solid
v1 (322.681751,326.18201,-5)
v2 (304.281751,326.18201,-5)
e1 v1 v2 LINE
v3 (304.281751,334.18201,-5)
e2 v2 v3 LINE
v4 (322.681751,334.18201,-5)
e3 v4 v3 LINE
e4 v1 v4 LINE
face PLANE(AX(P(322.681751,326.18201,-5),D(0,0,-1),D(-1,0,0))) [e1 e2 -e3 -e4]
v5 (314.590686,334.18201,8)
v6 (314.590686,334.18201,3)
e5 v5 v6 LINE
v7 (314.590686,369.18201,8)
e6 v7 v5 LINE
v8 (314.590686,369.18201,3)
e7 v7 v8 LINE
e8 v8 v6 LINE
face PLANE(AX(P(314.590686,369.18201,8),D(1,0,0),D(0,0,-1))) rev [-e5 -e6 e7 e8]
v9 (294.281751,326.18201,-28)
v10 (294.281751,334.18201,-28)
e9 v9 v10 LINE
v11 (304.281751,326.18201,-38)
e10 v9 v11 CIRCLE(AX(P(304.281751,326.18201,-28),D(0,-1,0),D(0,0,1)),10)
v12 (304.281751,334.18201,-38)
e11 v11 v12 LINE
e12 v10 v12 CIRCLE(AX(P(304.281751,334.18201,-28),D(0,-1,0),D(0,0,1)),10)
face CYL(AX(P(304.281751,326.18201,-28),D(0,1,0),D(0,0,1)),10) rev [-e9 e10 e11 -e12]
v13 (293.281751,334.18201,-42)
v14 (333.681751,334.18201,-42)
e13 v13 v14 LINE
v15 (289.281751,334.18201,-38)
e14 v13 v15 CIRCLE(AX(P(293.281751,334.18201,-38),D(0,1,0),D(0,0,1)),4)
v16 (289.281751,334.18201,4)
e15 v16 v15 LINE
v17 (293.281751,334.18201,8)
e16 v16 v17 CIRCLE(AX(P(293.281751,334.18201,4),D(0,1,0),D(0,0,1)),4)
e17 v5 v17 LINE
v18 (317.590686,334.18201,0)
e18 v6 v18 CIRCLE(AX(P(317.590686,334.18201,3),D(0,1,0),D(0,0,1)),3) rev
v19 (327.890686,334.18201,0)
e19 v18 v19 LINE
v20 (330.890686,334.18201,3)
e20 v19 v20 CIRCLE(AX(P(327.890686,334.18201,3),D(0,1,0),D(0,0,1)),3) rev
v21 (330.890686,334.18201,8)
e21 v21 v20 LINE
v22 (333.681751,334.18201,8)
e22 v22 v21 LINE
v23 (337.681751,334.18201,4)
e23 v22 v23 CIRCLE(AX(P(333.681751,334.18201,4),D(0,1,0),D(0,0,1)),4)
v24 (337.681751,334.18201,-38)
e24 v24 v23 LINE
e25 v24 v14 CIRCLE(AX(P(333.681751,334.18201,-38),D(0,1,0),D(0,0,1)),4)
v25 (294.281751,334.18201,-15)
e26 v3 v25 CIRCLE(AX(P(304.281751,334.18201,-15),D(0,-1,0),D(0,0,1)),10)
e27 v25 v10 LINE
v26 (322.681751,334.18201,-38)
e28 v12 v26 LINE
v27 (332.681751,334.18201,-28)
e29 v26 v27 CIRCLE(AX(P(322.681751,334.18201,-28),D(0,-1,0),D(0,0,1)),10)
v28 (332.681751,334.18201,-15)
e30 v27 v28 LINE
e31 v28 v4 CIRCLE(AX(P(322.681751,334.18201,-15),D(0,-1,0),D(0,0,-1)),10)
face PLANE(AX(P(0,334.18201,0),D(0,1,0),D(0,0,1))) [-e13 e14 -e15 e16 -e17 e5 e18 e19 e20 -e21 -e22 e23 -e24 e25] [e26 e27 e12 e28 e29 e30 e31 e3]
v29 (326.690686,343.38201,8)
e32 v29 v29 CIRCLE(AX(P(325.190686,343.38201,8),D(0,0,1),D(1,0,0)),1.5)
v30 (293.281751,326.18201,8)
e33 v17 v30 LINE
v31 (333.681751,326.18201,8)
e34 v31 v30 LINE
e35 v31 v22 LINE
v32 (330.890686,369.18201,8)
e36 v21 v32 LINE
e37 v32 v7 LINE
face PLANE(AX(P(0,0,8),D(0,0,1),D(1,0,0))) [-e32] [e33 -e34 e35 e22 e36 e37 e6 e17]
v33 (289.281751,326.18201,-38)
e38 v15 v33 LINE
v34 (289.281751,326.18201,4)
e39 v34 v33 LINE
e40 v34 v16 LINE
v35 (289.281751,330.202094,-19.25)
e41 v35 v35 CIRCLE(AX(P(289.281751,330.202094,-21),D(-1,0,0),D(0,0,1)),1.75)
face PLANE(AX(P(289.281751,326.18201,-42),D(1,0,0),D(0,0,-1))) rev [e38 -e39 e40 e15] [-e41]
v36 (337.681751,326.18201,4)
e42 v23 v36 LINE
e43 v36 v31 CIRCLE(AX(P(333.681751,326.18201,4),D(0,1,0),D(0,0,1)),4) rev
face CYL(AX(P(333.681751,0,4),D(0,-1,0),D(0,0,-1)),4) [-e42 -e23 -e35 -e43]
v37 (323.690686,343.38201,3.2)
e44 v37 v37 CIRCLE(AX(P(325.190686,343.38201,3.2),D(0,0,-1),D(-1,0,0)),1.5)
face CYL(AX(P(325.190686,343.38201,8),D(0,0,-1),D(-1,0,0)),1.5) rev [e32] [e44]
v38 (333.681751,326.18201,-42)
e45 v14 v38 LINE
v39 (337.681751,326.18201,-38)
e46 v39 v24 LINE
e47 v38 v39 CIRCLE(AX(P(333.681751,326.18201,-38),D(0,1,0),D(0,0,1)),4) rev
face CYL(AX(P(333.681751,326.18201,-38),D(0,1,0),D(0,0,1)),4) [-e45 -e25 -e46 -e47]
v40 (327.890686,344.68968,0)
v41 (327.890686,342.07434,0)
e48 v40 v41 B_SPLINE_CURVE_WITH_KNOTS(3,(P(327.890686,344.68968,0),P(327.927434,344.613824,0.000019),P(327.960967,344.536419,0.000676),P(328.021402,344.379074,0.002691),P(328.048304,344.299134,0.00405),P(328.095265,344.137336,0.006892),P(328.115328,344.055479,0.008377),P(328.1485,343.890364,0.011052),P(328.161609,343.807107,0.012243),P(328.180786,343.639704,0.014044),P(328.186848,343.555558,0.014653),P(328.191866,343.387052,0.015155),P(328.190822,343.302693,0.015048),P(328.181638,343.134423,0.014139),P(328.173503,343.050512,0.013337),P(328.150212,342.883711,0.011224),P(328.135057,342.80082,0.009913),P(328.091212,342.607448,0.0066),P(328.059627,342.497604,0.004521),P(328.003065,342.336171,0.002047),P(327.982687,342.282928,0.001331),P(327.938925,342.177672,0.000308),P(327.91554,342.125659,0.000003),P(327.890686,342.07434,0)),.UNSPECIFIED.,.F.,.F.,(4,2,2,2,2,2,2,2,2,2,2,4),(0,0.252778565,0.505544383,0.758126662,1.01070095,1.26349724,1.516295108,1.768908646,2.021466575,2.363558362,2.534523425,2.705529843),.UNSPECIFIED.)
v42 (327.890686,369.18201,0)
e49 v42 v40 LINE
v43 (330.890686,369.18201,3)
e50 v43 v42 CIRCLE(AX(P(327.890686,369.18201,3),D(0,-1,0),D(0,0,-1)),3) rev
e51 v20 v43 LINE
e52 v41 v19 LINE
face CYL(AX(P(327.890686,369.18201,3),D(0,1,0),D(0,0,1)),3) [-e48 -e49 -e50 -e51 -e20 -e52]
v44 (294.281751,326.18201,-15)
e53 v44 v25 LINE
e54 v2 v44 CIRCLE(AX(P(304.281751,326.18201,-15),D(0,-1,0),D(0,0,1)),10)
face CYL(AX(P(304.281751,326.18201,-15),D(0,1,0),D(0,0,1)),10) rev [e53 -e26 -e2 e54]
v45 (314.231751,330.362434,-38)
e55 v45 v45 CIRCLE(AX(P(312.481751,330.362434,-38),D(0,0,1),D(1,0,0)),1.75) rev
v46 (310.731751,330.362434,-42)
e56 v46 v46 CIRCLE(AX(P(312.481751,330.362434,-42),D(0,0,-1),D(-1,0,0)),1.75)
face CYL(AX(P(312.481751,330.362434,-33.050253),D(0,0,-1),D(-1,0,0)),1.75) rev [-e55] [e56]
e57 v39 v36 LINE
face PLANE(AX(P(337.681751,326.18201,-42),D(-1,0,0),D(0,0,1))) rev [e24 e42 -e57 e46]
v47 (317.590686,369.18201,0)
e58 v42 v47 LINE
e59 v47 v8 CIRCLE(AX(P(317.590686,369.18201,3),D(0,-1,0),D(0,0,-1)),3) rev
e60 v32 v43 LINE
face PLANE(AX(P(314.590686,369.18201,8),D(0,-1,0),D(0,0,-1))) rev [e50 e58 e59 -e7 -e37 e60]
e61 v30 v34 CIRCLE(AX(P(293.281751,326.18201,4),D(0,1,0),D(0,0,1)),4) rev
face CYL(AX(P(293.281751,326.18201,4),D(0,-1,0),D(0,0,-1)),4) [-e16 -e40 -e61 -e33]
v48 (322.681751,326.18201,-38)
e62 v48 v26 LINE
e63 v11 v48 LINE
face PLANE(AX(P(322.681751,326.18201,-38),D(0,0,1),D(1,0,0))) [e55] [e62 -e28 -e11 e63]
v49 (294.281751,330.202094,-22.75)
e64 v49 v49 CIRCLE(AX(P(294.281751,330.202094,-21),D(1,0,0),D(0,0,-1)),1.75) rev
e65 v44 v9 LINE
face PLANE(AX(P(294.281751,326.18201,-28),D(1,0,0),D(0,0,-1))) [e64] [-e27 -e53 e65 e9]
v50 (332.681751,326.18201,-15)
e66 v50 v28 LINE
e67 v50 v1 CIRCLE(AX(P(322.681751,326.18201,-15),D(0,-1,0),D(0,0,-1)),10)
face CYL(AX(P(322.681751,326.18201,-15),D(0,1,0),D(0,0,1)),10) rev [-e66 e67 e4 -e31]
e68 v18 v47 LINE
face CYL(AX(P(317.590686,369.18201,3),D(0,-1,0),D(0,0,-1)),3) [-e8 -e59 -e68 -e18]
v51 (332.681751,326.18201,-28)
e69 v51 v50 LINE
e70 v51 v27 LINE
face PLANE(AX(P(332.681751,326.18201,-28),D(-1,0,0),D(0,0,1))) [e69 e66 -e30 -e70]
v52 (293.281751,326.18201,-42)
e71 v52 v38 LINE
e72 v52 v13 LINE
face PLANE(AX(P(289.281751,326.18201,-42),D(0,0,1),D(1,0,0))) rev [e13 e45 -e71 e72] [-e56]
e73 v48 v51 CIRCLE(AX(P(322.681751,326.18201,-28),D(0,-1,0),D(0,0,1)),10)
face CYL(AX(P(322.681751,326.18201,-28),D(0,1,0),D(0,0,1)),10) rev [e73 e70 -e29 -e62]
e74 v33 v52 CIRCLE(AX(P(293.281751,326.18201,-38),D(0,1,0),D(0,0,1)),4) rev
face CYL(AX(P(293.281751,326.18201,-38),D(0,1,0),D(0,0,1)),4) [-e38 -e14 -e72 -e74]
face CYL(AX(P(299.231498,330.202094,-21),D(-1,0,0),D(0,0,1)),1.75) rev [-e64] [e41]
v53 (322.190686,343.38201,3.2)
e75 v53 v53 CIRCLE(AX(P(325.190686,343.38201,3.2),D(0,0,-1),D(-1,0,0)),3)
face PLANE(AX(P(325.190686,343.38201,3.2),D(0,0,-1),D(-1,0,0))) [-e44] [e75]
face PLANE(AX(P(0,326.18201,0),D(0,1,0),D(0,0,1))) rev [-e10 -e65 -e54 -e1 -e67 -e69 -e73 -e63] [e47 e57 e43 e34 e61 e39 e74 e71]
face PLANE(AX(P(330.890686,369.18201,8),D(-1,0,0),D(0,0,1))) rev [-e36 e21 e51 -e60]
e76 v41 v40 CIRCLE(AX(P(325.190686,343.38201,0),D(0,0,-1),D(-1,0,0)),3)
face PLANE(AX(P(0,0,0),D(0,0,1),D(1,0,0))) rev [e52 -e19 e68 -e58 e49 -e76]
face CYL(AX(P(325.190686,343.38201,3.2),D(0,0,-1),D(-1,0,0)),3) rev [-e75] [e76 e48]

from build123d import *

# Parameters (mm, degrees)
SKETCH1_W           = 16.3
SKETCH1_H           = 35
SKETCH1_R           = 1.5
BOSS_EXTRUDE1_DEPTH = 8
SKETCH2_W           = 48.4
SKETCH2_H           = 50
BOSS_EXTRUDE2_DEPTH = 8
SKETCH3_R           = 1.75
CUT_EXTRUDE1_DEPTH  = 4
SKETCH4_R           = 1.75
CUT_EXTRUDE2_DEPTH  = 5
SKETCH5_R           = 3
CUT_EXTRUDE3_DEPTH  = 3.2
FILLET1_R           = 4
FILLET2_R           = 3


with BuildPart() as part:
    # Sketch1 → Boss-Extrude1 (new body)
    with BuildSketch(Plane.XY):
        with Locations((322.740686013, 351.682010011)):
            Rectangle(SKETCH1_W, SKETCH1_H)
        with Locations((325.190686013, 343.382010011)):
            Circle(SKETCH1_R, mode=Mode.SUBTRACT)
    extrude(amount=BOSS_EXTRUDE1_DEPTH)

    # Sketch2 → Boss-Extrude2 (add)
    with BuildSketch(Plane(origin=(0, 334.182010011, 0), x_dir=(-1, 0, 0), z_dir=(0, -1, 0))):
        with Locations((-313.481750966, 17)):
            Rectangle(SKETCH2_W, SKETCH2_H)
        with BuildLine():
            Line((-322.681750966, 38), (-304.281750966, 38))
            ThreePointArc((-304.281750966, 38), (-297.210683154, 35.071067812), (-294.281750966, 28))
            Line((-294.281750966, 28), (-294.281750966, 15))
            ThreePointArc((-294.281750966, 15), (-297.210683154, 7.928932188), (-304.281750966, 5))
            Line((-304.281750966, 5), (-322.681750966, 5))
            ThreePointArc((-322.681750966, 5), (-329.752818778, 7.928932188), (-332.681750966, 15))
            Line((-332.681750966, 15), (-332.681750966, 28))
            ThreePointArc((-332.681750966, 28), (-329.752818778, 35.071067812), (-322.681750966, 38))
        make_face(mode=Mode.SUBTRACT)
    extrude(amount=BOSS_EXTRUDE2_DEPTH)

    # Sketch3 → Cut-Extrude1 (cut)
    with BuildSketch(Plane(origin=(0, 0, -42), x_dir=(-1, 0, 0), z_dir=(0, 0, -1))):
        with Locations((-312.481750966, 330.362434358)):
            Circle(SKETCH3_R)
    extrude(amount=-CUT_EXTRUDE1_DEPTH, mode=Mode.SUBTRACT)

    # Sketch4 → Cut-Extrude2 (cut)
    with BuildSketch(Plane.ZY.offset(-289.281750966)):
        with Locations((-21, 330.202094394)):
            Circle(SKETCH4_R)
    extrude(amount=-CUT_EXTRUDE2_DEPTH, mode=Mode.SUBTRACT)

    # Sketch5 → Cut-Extrude3 (cut)
    with BuildSketch(Plane(origin=(0, 0, 0), x_dir=(-1, 0, 0), z_dir=(0, 0, -1))):
        with Locations((-325.190686013, 343.382010011)):
            Circle(SKETCH5_R)
    extrude(amount=-CUT_EXTRUDE3_DEPTH, mode=Mode.SUBTRACT)

    # Fillet1
    fillet1_edges = [part.edges().sort_by_distance(p)[0] for p in [
        (337.681750966, 330.182010011, -42),
        (337.681750966, 330.182010011, 8),
        (289.281750966, 330.182010011, 8),
        (289.281750966, 330.182010011, -42),
    ]]
    fillet(fillet1_edges, radius=FILLET1_R)

    # Fillet2
    # the kernel refuses this fillet: 3 mm, written as the material it takes off along each edge
    with BuildSketch(Plane(origin=(330.890686013, 376.682010011, 0), x_dir=(-1, 0, 0), z_dir=(0, -1, 0))) as fillet2_piece_1:
        with BuildLine():
            CenterArc((FILLET2_R, -FILLET2_R), FILLET2_R, 90, 90)
            Line((0, -FILLET2_R), (0, 0))
            Line((0, 0), (FILLET2_R, 0))
        make_face()
    extrude(amount=42.5, mode=Mode.SUBTRACT)
    with BuildSketch(Plane(origin=(314.590686013, 334.182010011, 0), x_dir=(0, 0, 1), z_dir=(0, 1, 0))) as fillet2_piece_2:
        with BuildLine():
            CenterArc((FILLET2_R, FILLET2_R), FILLET2_R, 180, 90)
            Line((0, FILLET2_R), (0, 0))
            Line((0, 0), (FILLET2_R, 0))
        make_face()
    extrude(amount=42.5, mode=Mode.SUBTRACT)


solid = part.part
